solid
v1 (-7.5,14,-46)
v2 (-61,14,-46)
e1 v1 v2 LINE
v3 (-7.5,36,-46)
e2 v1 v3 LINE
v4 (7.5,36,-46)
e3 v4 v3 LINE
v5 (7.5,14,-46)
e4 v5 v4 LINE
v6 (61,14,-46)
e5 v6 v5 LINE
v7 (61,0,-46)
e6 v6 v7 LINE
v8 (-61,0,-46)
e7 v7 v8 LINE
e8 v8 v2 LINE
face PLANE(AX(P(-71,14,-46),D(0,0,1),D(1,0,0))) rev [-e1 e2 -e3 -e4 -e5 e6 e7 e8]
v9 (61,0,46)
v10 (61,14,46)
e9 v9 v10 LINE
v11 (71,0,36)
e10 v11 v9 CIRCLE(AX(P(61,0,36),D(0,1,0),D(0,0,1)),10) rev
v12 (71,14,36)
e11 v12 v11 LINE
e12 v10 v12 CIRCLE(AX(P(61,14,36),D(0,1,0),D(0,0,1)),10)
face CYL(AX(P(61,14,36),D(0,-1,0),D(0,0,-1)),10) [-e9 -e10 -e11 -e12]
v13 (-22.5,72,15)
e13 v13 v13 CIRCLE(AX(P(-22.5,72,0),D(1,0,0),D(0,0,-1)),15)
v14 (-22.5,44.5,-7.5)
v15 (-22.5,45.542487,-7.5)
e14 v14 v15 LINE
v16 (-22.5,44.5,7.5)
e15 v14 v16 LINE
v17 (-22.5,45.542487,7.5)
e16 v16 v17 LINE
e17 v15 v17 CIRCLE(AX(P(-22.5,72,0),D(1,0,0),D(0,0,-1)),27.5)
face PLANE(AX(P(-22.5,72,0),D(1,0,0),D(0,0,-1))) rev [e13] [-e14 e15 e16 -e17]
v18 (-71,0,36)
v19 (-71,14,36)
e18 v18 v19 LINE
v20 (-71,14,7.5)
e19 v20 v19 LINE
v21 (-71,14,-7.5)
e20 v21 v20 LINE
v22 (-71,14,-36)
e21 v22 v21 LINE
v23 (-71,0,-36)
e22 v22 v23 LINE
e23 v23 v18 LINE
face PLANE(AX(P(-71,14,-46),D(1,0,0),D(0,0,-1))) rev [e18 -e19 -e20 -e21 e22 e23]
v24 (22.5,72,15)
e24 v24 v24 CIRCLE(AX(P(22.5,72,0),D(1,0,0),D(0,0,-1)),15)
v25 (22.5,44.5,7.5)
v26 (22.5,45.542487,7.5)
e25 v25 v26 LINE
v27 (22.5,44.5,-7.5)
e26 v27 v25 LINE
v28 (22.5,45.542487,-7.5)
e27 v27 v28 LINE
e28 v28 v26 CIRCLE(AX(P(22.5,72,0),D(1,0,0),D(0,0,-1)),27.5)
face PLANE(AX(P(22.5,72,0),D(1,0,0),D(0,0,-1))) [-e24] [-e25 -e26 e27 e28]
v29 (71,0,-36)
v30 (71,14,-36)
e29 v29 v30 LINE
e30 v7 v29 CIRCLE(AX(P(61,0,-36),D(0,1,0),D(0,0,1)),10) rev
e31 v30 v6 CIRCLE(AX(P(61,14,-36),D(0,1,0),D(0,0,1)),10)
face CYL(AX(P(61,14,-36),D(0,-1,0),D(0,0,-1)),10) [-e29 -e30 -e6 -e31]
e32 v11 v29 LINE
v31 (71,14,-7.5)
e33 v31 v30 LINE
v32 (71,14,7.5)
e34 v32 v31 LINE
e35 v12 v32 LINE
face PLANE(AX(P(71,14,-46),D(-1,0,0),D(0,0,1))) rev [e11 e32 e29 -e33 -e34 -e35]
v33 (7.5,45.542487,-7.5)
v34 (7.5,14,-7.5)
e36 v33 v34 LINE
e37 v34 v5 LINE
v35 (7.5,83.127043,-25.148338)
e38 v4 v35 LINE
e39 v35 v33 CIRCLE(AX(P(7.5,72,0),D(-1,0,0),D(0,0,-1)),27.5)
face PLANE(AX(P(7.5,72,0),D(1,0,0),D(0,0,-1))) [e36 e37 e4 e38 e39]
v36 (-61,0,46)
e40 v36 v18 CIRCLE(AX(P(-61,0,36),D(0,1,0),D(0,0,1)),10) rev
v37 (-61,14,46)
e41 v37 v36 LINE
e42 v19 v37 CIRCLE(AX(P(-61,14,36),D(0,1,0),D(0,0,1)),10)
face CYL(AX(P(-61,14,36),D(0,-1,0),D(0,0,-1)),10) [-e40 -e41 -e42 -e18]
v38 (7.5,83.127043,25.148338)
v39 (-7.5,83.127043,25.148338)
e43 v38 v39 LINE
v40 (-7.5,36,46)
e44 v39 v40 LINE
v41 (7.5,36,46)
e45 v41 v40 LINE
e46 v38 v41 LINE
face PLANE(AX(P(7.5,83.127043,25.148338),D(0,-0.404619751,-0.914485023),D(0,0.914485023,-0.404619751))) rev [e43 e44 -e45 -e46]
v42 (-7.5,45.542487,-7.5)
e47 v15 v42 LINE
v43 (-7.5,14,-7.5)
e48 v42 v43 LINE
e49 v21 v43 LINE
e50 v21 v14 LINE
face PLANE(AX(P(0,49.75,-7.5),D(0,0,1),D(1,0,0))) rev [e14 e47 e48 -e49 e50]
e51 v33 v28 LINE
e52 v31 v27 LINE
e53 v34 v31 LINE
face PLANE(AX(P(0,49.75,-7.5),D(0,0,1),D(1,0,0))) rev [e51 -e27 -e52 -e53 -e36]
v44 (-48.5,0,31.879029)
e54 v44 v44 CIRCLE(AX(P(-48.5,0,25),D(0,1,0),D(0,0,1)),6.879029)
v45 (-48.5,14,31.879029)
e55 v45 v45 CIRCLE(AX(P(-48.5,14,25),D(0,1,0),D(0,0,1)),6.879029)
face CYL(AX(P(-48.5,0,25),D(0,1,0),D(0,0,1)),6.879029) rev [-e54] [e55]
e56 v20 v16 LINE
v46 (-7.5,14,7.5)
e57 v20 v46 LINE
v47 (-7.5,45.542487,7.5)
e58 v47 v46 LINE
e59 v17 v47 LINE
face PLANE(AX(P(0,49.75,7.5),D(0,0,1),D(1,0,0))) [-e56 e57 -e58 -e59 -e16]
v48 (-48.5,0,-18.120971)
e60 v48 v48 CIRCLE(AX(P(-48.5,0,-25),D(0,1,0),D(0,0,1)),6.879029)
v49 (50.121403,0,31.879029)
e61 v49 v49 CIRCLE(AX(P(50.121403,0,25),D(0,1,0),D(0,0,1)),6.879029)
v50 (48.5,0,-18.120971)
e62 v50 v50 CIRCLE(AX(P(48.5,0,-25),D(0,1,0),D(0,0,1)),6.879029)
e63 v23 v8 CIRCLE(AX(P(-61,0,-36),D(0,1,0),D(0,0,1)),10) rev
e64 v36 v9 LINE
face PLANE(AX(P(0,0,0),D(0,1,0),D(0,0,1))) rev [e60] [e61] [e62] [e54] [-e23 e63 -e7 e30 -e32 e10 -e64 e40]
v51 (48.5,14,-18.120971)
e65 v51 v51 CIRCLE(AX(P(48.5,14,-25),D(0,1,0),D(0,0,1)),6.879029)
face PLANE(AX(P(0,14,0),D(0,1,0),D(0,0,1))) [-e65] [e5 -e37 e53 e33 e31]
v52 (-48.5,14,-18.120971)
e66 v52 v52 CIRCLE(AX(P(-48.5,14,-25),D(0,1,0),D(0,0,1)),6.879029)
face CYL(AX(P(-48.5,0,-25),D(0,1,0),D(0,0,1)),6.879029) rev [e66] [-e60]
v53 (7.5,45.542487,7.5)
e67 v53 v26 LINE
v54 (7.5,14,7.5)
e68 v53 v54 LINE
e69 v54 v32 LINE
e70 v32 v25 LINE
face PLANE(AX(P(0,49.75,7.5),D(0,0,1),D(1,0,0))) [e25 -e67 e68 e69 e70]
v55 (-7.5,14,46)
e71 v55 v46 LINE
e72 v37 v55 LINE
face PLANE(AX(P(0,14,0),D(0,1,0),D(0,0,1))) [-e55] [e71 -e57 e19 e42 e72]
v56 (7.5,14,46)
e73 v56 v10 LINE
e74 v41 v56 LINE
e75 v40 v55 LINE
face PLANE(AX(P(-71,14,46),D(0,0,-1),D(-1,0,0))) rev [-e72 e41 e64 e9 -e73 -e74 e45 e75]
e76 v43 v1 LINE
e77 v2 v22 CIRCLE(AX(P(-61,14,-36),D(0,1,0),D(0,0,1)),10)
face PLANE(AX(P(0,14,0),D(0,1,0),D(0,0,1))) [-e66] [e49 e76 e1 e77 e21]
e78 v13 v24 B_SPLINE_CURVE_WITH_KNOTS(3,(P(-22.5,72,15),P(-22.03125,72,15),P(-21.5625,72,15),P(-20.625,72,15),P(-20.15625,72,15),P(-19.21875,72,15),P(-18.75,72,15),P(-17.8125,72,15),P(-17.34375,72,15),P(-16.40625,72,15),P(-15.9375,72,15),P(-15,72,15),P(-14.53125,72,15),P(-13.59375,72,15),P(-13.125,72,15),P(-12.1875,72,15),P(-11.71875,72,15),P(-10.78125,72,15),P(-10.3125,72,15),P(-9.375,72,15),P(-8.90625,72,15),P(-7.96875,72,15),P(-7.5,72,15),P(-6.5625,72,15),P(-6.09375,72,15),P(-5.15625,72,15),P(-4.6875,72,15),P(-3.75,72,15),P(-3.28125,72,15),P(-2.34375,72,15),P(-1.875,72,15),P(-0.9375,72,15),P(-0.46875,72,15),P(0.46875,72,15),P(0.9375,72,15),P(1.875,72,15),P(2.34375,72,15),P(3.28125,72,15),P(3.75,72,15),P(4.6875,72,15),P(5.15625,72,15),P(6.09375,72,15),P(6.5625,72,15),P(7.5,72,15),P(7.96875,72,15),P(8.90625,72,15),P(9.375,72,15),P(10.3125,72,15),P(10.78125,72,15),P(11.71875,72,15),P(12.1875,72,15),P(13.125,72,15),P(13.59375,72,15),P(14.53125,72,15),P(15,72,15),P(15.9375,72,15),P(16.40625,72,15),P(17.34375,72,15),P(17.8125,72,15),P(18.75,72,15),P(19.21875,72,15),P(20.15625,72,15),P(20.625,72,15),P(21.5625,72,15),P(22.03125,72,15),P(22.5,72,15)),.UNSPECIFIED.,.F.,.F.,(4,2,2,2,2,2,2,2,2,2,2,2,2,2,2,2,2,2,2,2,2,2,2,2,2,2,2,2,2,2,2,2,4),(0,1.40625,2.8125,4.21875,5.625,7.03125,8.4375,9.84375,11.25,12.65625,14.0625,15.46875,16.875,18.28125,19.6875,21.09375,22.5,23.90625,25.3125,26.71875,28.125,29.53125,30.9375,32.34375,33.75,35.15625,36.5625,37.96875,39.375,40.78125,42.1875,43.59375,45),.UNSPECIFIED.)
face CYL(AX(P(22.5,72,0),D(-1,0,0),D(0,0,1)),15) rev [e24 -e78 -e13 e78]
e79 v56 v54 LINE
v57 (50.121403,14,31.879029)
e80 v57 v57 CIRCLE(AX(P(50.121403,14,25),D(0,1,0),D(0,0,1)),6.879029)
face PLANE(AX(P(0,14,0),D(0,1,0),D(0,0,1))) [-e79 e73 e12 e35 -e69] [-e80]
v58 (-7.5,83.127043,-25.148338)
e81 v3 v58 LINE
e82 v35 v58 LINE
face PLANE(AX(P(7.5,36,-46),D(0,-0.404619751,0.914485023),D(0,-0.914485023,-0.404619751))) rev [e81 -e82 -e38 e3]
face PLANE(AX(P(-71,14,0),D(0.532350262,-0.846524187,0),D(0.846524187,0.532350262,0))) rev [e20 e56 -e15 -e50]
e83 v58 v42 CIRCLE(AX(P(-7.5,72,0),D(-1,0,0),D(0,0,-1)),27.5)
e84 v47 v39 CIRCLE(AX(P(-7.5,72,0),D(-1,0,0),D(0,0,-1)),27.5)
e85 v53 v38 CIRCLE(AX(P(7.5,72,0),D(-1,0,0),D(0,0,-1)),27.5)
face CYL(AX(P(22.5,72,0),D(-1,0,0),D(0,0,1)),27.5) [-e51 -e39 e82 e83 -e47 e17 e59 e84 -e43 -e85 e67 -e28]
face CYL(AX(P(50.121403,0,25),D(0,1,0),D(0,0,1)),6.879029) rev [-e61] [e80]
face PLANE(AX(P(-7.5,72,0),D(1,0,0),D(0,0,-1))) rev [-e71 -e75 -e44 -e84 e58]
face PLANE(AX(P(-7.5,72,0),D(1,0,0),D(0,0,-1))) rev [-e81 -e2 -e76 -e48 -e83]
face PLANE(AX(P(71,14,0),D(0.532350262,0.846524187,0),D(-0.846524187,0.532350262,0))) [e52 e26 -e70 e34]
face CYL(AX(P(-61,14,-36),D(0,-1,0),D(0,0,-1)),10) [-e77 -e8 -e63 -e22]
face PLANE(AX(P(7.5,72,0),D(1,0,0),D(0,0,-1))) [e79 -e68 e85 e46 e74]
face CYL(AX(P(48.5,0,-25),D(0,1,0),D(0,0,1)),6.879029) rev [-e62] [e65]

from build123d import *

# Parameters (mm, degrees)
SKETCH1_W           = 142
SKETCH1_H           = 92
BOSS_EXTRUDE1_DEPTH = 14
FILLET1_R           = 10
SKETCH2_R           = 27.5
SKETCH2_R_2         = 15
BOSS_EXTRUDE2_DEPTH = 22.5
BOSS_EXTRUDE3_DEPTH = 7.5
RIB1_START          = -7.5
RIB1_DEPTH          = 15
SKETCH6_R           = 6.879028827
CUT_EXTRUDE1_DEPTH  = 121.279881942


with BuildPart() as part:
    # Sketch1 → Boss-Extrude1 (new body)
    with BuildSketch(Plane(origin=(0, 0, 0), x_dir=(1, 0, 0), z_dir=(0, 1, 0))):
        Rectangle(SKETCH1_W, SKETCH1_H)
    extrude(amount=BOSS_EXTRUDE1_DEPTH)

    # Fillet1
    fillet1_edges = [part.edges().sort_by_distance(p)[0] for p in [
        (71, 7, 46),
        (-71, 7, 46),
        (-71, 7, -46),
        (71, 7, -46),
    ]]
    fillet(fillet1_edges, radius=FILLET1_R)



with BuildPart() as body_2:
    # Sketch2 → Boss-Extrude2 (new, symmetric)
    with BuildSketch(Plane(origin=(0, 0, 0), x_dir=(0, 0, -1), z_dir=(1, 0, 0))):
        with Locations(Location((0, 72, 0), (0, 0, 180))):
            Circle(SKETCH2_R)
        with Locations(Location((0, 72, 0), (0, 0, 180))):
            Circle(SKETCH2_R_2, mode=Mode.SUBTRACT)
    extrude(amount=BOSS_EXTRUDE2_DEPTH, both=True)


with BuildPart() as part_1:
    add(part.part)

    add(body_2.part)  # Boss-Extrude3 merges body 2
    # Sketch4 → Boss-Extrude3 (add, symmetric)
    with BuildSketch(Plane(origin=(0, 0, 0), x_dir=(0, 0, -1), z_dir=(1, 0, 0))):
        with BuildLine():
            Line((-25.148338126, 83.127043161), (-46, 36))
            Line((-46, 36), (-46, 14))
            Line((-46, 14), (46, 14))
            Line((46, 14), (46, 36))
            Line((46, 36), (25.148338126, 83.127043161))
            ThreePointArc((25.148338126, 83.127043161), (0, 44.5), (-25.148338126, 83.127043161))
        make_face()
    extrude(amount=BOSS_EXTRUDE3_DEPTH, both=True)

    # Rib1: read off the stored shape, not the designer's step
    # Rib1 outline → Rib1 (add)
    with BuildSketch(Plane.XY.offset(RIB1_START)):
        Polygon((-7.5, 14), (-7.5, 45.542486889), (-22.5, 45.542486889), (-22.5, 44.5), (-71, 14), align=None)
    rib1 = extrude(amount=RIB1_DEPTH)

    # Mirror1: Rib1 across plane
    add(rib1.mirror(Plane(origin=(0, 0, 0), x_dir=(0, 0, 1), z_dir=(1, 0, 0))))

    # Sketch6 → Cut-Extrude1 (cut, through all)
    with BuildSketch(Plane(origin=(0, 14, 0), x_dir=(1, 0, 0), z_dir=(0, 1, 0))):
        with Locations(Location((-48.5, 25, 0), (0, 0, 270))):
            Circle(SKETCH6_R)
        with Locations(Location((-48.5, -25, 0), (0, 0, 270))):
            Circle(SKETCH6_R)
        with Locations(Location((48.5, 25, 0), (0, 0, 270))):
            Circle(SKETCH6_R)
        with Locations(Location((50.121402644, -25, 0), (0, 0, 270))):
            Circle(SKETCH6_R)
    extrude(amount=-CUT_EXTRUDE1_DEPTH, mode=Mode.SUBTRACT)


solid = part_1.part
